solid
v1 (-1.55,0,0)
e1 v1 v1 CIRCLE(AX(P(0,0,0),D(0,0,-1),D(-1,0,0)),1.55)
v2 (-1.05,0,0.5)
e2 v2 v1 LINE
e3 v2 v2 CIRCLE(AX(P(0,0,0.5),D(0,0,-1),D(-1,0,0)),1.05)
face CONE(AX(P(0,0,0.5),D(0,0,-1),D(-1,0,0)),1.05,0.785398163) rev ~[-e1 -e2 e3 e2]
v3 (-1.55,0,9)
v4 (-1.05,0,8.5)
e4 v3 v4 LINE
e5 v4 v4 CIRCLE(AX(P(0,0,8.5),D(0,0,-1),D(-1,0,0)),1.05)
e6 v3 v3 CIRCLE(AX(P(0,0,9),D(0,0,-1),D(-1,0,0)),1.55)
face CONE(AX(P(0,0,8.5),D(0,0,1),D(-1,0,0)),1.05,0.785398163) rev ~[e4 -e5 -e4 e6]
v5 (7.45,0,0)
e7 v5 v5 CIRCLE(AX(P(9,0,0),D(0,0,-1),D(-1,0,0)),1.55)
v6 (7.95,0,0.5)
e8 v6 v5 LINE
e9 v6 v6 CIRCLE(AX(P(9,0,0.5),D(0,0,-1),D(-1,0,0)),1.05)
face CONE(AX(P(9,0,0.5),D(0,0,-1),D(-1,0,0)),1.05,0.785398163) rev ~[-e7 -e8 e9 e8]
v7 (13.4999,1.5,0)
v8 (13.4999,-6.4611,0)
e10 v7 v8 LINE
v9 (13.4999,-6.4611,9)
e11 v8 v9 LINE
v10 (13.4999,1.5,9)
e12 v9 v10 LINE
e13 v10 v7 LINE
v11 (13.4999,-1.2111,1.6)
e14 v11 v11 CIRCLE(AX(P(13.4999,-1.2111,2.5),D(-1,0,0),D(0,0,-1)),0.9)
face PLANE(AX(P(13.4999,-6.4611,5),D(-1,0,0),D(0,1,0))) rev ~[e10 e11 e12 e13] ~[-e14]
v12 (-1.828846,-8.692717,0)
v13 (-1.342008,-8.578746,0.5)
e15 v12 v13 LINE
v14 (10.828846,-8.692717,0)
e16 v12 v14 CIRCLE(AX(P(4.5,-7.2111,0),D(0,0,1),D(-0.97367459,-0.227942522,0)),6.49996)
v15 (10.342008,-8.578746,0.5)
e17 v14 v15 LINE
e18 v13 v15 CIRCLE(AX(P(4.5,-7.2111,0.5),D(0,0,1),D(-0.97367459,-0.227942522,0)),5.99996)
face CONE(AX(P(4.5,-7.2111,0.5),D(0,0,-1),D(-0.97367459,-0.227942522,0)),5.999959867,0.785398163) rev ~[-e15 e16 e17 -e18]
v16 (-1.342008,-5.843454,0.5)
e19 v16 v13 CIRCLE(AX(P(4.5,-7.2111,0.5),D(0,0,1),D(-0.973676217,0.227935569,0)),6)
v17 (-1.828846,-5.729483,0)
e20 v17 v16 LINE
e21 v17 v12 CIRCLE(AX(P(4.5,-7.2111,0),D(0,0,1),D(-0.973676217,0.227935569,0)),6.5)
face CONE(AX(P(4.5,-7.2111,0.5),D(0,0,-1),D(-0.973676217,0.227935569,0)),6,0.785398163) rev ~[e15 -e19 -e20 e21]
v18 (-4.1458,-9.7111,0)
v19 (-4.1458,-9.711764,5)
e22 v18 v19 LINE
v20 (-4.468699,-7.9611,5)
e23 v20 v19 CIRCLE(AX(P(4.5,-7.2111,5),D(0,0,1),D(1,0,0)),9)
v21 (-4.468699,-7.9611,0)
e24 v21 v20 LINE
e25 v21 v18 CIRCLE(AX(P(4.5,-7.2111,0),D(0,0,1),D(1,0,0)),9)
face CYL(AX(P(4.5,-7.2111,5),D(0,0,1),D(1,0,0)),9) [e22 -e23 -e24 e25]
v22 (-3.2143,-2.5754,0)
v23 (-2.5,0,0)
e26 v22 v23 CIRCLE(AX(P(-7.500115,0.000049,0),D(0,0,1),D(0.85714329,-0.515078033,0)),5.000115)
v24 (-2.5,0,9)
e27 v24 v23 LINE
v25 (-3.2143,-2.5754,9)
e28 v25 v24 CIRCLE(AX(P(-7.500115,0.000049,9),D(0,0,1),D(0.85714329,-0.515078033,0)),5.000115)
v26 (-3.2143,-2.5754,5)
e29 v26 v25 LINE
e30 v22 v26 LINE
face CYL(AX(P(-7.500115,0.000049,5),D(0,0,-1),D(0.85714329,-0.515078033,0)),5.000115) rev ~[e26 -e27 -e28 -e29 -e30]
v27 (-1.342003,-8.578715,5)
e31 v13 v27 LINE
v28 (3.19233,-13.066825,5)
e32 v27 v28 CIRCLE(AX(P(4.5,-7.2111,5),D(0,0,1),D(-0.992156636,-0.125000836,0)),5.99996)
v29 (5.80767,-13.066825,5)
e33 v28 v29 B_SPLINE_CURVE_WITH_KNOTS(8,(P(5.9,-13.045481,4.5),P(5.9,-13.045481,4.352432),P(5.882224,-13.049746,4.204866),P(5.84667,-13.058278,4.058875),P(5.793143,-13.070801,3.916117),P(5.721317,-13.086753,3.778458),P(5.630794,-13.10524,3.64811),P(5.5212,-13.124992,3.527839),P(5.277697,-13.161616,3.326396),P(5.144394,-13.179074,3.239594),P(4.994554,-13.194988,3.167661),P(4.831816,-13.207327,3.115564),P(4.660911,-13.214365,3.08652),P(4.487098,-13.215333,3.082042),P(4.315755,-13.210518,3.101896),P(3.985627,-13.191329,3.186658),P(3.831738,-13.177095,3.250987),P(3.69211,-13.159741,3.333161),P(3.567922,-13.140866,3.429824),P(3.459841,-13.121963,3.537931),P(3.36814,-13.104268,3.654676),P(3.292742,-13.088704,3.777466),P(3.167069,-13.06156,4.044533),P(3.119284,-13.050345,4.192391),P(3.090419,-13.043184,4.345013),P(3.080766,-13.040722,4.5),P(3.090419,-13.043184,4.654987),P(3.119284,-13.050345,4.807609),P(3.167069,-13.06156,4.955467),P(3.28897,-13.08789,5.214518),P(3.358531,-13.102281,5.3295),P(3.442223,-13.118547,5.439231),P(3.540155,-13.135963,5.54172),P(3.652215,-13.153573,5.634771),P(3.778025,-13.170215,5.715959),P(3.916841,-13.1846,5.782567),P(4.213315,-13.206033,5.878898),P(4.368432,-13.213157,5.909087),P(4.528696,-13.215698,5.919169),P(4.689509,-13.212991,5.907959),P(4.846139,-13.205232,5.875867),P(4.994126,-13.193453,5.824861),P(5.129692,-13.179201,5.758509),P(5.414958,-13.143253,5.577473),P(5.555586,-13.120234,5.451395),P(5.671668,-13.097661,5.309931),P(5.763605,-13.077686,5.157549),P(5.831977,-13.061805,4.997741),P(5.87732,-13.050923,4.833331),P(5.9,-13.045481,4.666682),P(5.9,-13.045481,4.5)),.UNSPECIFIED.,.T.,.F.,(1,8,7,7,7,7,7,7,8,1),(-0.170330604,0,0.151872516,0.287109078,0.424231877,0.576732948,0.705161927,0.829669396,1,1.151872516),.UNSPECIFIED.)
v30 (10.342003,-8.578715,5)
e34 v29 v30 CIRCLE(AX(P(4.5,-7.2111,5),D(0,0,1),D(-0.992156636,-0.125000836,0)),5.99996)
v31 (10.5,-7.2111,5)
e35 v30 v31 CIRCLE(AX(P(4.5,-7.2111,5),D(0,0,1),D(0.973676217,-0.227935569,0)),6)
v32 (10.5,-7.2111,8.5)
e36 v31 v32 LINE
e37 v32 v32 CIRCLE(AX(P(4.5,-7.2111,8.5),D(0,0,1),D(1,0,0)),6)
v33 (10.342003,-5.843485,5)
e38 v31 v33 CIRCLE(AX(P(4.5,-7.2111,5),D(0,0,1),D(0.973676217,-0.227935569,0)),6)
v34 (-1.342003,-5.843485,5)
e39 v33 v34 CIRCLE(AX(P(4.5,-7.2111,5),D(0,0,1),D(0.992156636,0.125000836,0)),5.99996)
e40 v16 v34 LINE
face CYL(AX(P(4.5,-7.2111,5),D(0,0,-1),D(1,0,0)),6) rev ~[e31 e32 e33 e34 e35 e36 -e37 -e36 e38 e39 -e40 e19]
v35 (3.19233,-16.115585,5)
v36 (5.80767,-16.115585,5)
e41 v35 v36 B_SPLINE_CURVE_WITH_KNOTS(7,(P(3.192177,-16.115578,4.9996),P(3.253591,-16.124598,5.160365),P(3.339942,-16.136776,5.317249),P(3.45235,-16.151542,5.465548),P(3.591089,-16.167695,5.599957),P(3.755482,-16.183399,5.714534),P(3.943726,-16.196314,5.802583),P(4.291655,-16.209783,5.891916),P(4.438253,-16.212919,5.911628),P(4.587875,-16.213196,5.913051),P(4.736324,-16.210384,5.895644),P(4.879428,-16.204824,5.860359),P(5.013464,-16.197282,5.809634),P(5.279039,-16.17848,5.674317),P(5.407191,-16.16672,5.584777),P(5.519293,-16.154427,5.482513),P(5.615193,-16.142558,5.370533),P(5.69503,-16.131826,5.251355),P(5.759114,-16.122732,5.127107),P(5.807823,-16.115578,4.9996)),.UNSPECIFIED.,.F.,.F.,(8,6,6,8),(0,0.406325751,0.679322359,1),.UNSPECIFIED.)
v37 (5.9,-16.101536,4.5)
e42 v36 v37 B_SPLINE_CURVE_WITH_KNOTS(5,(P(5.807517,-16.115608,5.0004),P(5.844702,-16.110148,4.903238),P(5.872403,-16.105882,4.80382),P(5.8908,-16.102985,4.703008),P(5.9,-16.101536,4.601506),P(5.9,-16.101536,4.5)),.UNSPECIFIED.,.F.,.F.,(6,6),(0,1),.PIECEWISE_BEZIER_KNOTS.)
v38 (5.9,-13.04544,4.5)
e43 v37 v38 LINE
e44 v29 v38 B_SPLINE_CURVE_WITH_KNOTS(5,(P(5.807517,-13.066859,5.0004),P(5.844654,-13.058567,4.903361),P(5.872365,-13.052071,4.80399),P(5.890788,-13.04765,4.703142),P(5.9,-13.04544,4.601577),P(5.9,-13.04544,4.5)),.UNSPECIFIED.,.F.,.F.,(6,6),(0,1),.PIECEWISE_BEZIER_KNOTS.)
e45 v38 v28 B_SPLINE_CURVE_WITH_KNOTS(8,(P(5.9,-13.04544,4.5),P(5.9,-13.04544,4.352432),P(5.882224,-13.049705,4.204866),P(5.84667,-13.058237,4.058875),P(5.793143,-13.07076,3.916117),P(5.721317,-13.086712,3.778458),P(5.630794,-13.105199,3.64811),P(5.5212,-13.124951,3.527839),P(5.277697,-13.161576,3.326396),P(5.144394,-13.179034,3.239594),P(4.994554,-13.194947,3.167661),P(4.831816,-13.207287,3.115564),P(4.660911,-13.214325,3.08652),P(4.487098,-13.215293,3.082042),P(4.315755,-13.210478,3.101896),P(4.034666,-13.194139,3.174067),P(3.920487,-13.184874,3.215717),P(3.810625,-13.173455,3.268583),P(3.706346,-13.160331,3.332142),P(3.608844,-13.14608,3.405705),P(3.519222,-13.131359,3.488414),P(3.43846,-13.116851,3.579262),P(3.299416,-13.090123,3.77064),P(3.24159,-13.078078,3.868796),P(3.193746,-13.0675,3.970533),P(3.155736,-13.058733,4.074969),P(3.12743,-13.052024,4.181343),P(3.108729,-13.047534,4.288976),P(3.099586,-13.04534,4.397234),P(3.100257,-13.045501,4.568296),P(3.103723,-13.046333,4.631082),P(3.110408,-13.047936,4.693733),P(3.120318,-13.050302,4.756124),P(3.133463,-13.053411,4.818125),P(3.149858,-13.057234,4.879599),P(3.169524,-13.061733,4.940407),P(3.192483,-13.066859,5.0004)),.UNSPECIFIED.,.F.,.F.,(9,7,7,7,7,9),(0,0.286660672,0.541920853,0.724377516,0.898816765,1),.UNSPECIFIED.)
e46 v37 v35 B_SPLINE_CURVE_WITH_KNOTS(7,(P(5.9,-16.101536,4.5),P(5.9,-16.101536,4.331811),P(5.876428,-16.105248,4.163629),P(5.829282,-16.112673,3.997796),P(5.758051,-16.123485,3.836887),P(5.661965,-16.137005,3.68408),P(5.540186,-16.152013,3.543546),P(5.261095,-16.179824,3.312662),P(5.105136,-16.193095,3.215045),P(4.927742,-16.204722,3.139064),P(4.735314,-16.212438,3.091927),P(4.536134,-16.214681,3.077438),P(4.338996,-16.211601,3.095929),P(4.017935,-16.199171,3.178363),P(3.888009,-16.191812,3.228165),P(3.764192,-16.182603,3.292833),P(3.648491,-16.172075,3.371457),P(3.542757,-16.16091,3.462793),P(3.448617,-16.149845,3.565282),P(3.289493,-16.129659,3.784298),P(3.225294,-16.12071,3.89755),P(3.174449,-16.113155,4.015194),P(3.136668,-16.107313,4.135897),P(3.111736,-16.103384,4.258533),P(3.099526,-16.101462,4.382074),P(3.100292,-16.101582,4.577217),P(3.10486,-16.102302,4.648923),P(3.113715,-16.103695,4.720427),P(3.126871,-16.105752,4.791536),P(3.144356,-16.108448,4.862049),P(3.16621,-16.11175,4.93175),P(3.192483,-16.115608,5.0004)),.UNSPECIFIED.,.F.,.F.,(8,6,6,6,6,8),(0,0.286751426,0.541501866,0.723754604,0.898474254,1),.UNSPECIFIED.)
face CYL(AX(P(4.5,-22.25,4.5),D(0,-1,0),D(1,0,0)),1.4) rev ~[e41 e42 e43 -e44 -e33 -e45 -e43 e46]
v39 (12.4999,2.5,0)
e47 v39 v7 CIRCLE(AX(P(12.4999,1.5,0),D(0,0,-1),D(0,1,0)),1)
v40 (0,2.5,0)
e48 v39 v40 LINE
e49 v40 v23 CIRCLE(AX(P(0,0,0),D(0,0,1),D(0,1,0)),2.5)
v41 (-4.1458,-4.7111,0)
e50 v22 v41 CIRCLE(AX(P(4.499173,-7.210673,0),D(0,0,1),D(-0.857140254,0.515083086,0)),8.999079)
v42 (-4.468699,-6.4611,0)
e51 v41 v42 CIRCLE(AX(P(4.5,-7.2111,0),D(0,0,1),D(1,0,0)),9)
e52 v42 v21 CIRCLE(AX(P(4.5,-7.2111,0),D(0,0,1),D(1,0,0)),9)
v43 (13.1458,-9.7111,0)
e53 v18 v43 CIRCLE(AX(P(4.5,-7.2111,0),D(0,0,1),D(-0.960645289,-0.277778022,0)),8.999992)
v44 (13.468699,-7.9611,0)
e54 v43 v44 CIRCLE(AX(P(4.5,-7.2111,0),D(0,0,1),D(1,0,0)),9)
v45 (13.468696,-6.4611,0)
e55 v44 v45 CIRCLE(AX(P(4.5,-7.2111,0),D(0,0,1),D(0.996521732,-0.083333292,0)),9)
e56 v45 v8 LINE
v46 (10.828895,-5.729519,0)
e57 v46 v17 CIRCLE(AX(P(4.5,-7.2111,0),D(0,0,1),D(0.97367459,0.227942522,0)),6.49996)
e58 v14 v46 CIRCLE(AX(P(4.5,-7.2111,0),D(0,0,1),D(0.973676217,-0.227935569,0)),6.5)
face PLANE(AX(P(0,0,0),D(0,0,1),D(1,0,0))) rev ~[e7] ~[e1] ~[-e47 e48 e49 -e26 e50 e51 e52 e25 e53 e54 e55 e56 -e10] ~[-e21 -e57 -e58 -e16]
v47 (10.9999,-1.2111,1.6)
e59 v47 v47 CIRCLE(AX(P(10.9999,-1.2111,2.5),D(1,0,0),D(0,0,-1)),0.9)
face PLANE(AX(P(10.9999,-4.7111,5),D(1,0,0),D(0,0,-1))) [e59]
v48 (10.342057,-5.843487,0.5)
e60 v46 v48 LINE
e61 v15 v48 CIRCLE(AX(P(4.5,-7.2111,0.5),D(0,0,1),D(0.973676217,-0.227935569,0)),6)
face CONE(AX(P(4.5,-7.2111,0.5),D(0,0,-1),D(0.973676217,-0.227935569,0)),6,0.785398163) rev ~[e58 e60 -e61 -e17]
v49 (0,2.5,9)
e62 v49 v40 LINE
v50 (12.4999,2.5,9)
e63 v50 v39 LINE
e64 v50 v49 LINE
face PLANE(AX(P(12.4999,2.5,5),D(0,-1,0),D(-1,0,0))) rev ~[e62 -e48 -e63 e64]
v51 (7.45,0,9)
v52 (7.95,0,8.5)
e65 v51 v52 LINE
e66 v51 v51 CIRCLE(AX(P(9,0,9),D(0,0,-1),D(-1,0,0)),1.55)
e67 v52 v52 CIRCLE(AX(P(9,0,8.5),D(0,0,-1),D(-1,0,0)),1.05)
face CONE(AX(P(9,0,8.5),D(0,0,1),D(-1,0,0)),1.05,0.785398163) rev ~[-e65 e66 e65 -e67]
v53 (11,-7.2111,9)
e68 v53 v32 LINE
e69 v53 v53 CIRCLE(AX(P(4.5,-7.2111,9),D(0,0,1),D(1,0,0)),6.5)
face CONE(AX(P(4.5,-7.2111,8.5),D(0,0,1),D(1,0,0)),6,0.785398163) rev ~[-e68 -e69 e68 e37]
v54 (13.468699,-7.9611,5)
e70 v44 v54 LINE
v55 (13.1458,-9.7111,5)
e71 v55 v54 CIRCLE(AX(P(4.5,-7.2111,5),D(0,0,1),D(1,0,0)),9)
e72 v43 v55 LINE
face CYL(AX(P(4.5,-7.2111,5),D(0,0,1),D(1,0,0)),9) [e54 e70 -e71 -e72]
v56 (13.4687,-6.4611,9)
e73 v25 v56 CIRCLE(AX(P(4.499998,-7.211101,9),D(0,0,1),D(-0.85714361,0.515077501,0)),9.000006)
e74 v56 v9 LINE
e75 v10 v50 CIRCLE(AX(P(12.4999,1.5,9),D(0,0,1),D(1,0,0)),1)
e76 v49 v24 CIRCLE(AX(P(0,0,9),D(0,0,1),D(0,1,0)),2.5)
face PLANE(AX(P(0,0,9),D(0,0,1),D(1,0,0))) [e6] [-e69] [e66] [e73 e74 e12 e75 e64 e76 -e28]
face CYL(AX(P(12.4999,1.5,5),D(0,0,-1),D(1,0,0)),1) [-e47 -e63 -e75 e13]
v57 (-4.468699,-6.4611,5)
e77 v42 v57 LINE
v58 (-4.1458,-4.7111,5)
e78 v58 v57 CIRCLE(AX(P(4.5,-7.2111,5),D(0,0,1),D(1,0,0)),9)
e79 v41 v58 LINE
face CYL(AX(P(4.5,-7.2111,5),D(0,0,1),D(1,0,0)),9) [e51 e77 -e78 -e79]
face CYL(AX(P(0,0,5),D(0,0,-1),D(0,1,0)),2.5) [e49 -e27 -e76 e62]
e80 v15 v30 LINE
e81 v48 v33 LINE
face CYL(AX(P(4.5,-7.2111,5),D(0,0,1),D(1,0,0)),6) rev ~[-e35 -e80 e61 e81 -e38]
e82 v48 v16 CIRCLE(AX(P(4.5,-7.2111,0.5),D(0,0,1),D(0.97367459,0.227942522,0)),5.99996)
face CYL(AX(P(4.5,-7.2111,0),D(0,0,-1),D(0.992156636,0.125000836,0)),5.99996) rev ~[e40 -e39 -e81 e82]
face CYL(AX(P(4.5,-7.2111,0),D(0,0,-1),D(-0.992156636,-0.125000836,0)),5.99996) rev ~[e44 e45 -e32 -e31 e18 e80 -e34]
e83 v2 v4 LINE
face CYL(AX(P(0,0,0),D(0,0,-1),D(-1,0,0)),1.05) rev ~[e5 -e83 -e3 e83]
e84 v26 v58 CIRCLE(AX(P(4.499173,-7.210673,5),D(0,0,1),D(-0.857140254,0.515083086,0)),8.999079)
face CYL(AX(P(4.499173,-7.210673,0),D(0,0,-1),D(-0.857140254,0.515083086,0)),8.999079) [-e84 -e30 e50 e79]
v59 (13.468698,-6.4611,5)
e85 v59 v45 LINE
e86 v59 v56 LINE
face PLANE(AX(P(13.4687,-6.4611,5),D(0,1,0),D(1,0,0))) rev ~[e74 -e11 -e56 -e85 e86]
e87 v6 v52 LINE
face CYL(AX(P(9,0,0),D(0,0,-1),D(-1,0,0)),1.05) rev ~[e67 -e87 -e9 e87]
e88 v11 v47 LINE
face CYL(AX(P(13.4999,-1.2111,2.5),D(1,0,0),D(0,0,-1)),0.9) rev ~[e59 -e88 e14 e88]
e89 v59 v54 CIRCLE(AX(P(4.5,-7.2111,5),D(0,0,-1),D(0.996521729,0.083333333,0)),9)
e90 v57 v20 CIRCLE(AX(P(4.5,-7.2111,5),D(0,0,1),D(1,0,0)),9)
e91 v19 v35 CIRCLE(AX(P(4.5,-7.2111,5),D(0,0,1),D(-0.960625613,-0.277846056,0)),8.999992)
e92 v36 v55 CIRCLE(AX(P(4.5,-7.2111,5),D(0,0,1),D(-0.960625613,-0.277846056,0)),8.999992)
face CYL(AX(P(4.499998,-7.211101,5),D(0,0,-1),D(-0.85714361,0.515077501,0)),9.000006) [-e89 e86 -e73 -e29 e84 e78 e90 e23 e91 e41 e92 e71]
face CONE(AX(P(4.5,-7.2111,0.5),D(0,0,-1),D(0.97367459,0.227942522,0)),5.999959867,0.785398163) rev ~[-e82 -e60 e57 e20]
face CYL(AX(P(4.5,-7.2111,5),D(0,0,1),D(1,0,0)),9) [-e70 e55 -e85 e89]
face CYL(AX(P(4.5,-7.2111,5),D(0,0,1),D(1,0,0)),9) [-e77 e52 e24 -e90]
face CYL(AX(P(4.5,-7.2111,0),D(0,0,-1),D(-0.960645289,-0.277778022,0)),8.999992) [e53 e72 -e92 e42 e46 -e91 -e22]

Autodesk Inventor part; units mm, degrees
ref_plane "YZ Plane" through (0, 0, 0) normal (1, 0, 0) x (0, 1, 0)
ref_plane "XZ Plane" through (0, 0, 0) normal (0, 1, 0) x (-1, 0, 0)
sketch "Sketch1" plane through (0, 0, 0) normal (0, 0, 1) x (1, 0, 0)
  circle A0 centre (9, 0) radius 1
  circle A1 centre (0, 0) radius 1
  line L0 (0, 2.5) -> (9, 2.5)
  arc A2 (0, 2.5) -> (-2.5, 0) centre (0, 0) ccw
  arc A3 (11.5, 0) -> (9, 2.5) centre (9, 0) ccw
  arc A4 (-3.2143, -2.5754) -> (-2.5, 0) centre (-7.5, 0) ccw
  arc A5 (11.5, 0) -> (12.2143, -2.5754) centre (16.5, 0) ccw
  arc A6 (-3.2143, -2.5754) -> (-4.1458, -4.7111) centre (4.5, -7.2111) ccw
  line L1 (-8.5, -4.7111) -> (-4.1458, -4.7111)
  line L2 (13.1458, -4.7111) -> (17.5, -4.7111)
  line L3 (17.5, -9.7111) -> (13.1458, -9.7111)
  line L4 (-4.1458, -9.7111) -> (-8.5, -9.7111)
  line L5 (17.5, -7.9611) -> (10.4529, -7.9611)
  line L6 (-1.4529, -7.9611) -> (-8.5, -7.9611)
  line L7 (-8.5, -6.4611) -> (-1.4529, -6.4611)
  line L8 (10.4529, -6.4611) -> (17.5, -6.4611)
  arc A7 (-4.1458, -9.7111) -> (13.1458, -9.7111) centre (4.5, -7.2111) ccw
  arc A8 (13.1458, -4.7111) -> (12.2143, -2.5754) centre (4.5, -7.2111) ccw
  arc A9 (-1.4529, -7.9611) -> (10.4529, -7.9611) centre (4.5, -7.2111) ccw
  arc A10 (10.4529, -6.4611) -> (-1.4529, -6.4611) centre (4.5, -7.2111) ccw
  line L9 (17.5, -4.7111) -> (17.5, -6.4611)
  line L10 (17.5, -7.9611) -> (17.5, -9.7111)
  line L11 (-8.5, -9.7111) -> (-8.5, -7.9611)
  line L12 (-8.5, -6.4611) -> (-8.5, -4.7111)
extrude "Extrusion1" add sketch "Sketch1" along normal blind 5
sketch "Sketch2" plane through (13.1458, -9.7111, 0) normal (0, -1, 0) x (1, 0, 0)
  line L0 (4.3542, 0) -> (4.3542, 5) projected
  line L1 (0, 0) -> (0, 5) projected
  circle A0 centre (2.1771, 2.5) radius 0.9
  circle A1 centre (-19.4687, 2.5) radius 0.9
  point P0 (-13.1458, 0)
  dimension "d13" = 1.8
extrude "Extrusion2" cut sketch "Sketch2" against normal blind 5
fillet "Fillet1" radius 0.8 8 edges at (17.5, -4.7111, 2.5) (17.5, -9.7111, 2.5) (-8.5, -4.7111, 2.5) (-8.5, -9.7111, 2.5) (17.5, -6.4611, 2.5) (17.5, -7.9611, 2.5) (-8.5, -7.9611, 2.5) (-8.5, -6.4611, 2.5)
fillet "Fillet2" radius 0.8 4 edges at (-1.4529, -6.4611, 2.5) (10.4529, -6.4611, 2.5) (10.4529, -7.9611, 2.5) (-1.4529, -7.9611, 2.5)
sketch "Sketch3" plane through (0, 0, 5) normal (0, 0, 1) x (1, 0, 0)
  arc A0 (11.5, 0) -> (9, 2.5) centre (9, 0) ccw projected
  line L0 (14.4229, -6.4611) -> (14.4229, -4.7111) projected
  line L1 (9, 2.5) -> (14.4229, 2.5)
  line L2 (14.4229, 2.5) -> (14.4229, -4.7111)
  line L3 (14.4229, -4.7111) -> (9, -4.7111)
  line L4 (9, -4.7111) -> (9, 2.5)
  arc A1 (13.1458, -4.7111) -> (12.2143, -2.5754) centre (4.5, -7.2111) ccw projected
  arc A2 (11.5, 0) -> (12.2143, -2.5754) centre (16.5, 0) ccw projected
  point P0 (0, 0)
extrude "Extrusion3" add sketch "Sketch3" against normal blind 5 contours A0 L1 L2 L3 A1 A2
sketch "Sketch4" plane through (14.4229, -4.7111, 5) normal (1, 0, 0) x (0, 0, -1)
  line L0 (0, 0) -> (0, 7.2111) projected
  line L1 (2.5, 0) -> (0, 0) projected
  line L2 (5, 0) -> (2.5, 0) projected
  line L3 (5, 7.2111) -> (5, 0) projected
  line L4 (0, 7.2111) -> (5, 7.2111) projected
  point P0 (5, 4.7111)
extrude "Extrusion4" cut sketch "Sketch4" against normal blind 0.923
sketch "Sketch5" plane through (13.4999, -4.7111, 5) normal (1, 0, 0) x (0, 0, -1)
  line L0 (0, 3.5) -> (5, 3.5) projected
  circle A0 centre (2.5, 3.5) radius 0.9
  point P0 (5, 4.7111)
  dimension "d25" = 1.8
extrude "Extrusion5" cut sketch "Sketch5" against normal blind 2.5
fillet "Fillet3" radius 1 1 edges at (13.4999, 2.5, 2.5)
sketch "Sketch6" plane through (0, 0, 5) normal (0, 0, 1) x (1, 0, 0)
  arc A0 (-1.342, -8.5787) -> (10.342, -8.5787) centre (4.5, -7.2111) ccw projected
  circle A1 centre (4.5, -7.2111) radius 6
  circle A2 centre (4.5, -7.2111) radius 9
  line L0 (13.4999, -4.7111) -> (13.4999, 1.5) projected
  line L1 (13.4999, -4.7111) -> (17.88, -4.7111)
  line L2 (17.88, -4.7111) -> (17.88, -10.4948)
  line L3 (17.88, -10.4948) -> (13.4999, -10.4948)
  line L4 (13.4999, -10.4948) -> (13.4999, -4.7111)
  line L5 (-4.1458, -4.7111) -> (-7.7, -4.7111) projected
  line L6 (-4.1458, -4.7111) -> (-9.7441, -4.7111)
  line L7 (-9.7441, -4.7111) -> (-9.7441, -9.7121)
  line L8 (-9.7441, -9.7121) -> (-4.1458, -9.7121)
  line L9 (-4.1458, -9.7121) -> (-4.1458, -4.7111)
  line L10 (13.4999, -10.4948) -> (12.8796, -10.4948)
  point P0 (0, 0)
  point P1 (-4.1458, -9.7111)
  point P2 (13.4999, -7.1696)
extrude "Extrusion6" cut sketch "Sketch6" against normal blind 10 contours L4 L10 A2 | L4 L1 L2 L3 | A2 L8 L7 L6 L5
sketch "Sketch7" plane through (0, 0, 5) normal (0, 0, 1) x (1, 0, 0)
  arc A0 (-1.342, -8.5787) -> (10.342, -8.5787) centre (4.5, -7.2111) ccw projected
  circle A1 centre (4.5, -7.2111) radius 6
  circle A2 centre (4.5, -7.2111) radius 9
  line L0 (-4.4687, -6.4611) -> (-2.121, -6.4611) projected
  arc A3 (-2.121, -6.4611) -> (-1.342, -5.8435) centre (-2.121, -5.6611) ccw projected
  line L1 (-2.121, -7.9611) -> (-4.4687, -7.9611) projected
  arc A4 (-1.342, -8.5787) -> (-2.121, -7.9611) centre (-2.121, -8.7611) ccw projected
  line L2 (11.121, -6.4611) -> (13.4999, -6.4611) projected
  arc A5 (10.342, -5.8435) -> (11.121, -6.4611) centre (11.121, -5.6611) ccw projected
  arc A6 (11.121, -7.9611) -> (10.342, -8.5787) centre (11.121, -8.7611) ccw projected
  line L3 (13.4687, -7.9611) -> (11.121, -7.9611) projected
  point P0 (0, 0)
  point P1 (13.4687, -6.4611)
  point P2 (10.342, -8.5787)
  point P3 (-1.342, -8.5787)
extrude "Extrusion7" add sketch "Sketch7" against normal up to surface (5 mm away) contours A4 L1 A2 L0 A3 A1 | A1 A5 L2 A2 L3 A6
sketch "Sketch8" plane through (0, 0, 5) normal (0, 0, 1) x (1, 0, 0)
  circle A0 centre (4.5, -7.2111) radius 6 projected
  circle A1 centre (0, 0) radius 1 projected
  circle A2 centre (9, 0) radius 1 projected
  arc A3 (-3.2143, -2.5754) -> (13.4687, -6.4611) centre (4.5, -7.2111) ccw projected
  line L0 (13.4687, -6.4611) -> (13.4999, -6.4611) projected
  line L1 (13.4999, -6.4611) -> (13.4999, 1.5) projected
  arc A4 (13.4999, 1.5) -> (12.4999, 2.5) centre (12.4999, 1.5) ccw projected
  line L2 (12.4999, 2.5) -> (0, 2.5) projected
  arc A5 (0, 2.5) -> (-2.5, 0) centre (0, 0) ccw projected
  arc A6 (-3.2143, -2.5754) -> (-2.5, 0) centre (-7.5, 0) ccw projected
extrude "Extrusion8" add sketch "Sketch8" along normal blind 4
ref_plane "Work Plane1" through (0, -22.25, 0) normal (0, 1, 0) x (1, 0, 0)
sketch "Sketch9" plane through (0, -22.25, 0) normal (0, 1, 0) x (1, 0, 0)
  line L0 (-4.5, -9) -> (13.5, -9) projected
  line L1 (13.5, 0) -> (13.5, -9) projected
  circle A0 centre (4.5, -4.5) radius 1.4
  point P0 (0, 0)
  point P1 (-3.2143, -9)
  point P2 (13.4687, -9)
  dimension "d36" = 2.8
extrude "Extrusion9" cut sketch "Sketch9" along normal blind 10
chamfer "Chamfer2" distance 0.5 angle 45 2 edges at (4.5, -13.2111, 0) (-1.5, -7.2111, 9)
sketch "Sketch10" plane through (0, 0, 0) normal (0, 0, -1) x (-1, 0, 0)
  circle A0 centre (0, 0) radius 1.05
  circle A1 centre (-9, 0) radius 1 projected
  circle A2 centre (-9, 0) radius 1.05
  dimension "d42" = 2.1
  dimension "d43" = 2.1
extrude "Extrusion10" cut sketch "Sketch10" against normal blind 10
chamfer "Chamfer3" distance 0.5 angle 45 4 edges at (1.05, 0, 0) (10.05, 0, 0) (1.05, 0, 9) (10.05, 0, 9)
properties part number "hold pen - slider pen"
